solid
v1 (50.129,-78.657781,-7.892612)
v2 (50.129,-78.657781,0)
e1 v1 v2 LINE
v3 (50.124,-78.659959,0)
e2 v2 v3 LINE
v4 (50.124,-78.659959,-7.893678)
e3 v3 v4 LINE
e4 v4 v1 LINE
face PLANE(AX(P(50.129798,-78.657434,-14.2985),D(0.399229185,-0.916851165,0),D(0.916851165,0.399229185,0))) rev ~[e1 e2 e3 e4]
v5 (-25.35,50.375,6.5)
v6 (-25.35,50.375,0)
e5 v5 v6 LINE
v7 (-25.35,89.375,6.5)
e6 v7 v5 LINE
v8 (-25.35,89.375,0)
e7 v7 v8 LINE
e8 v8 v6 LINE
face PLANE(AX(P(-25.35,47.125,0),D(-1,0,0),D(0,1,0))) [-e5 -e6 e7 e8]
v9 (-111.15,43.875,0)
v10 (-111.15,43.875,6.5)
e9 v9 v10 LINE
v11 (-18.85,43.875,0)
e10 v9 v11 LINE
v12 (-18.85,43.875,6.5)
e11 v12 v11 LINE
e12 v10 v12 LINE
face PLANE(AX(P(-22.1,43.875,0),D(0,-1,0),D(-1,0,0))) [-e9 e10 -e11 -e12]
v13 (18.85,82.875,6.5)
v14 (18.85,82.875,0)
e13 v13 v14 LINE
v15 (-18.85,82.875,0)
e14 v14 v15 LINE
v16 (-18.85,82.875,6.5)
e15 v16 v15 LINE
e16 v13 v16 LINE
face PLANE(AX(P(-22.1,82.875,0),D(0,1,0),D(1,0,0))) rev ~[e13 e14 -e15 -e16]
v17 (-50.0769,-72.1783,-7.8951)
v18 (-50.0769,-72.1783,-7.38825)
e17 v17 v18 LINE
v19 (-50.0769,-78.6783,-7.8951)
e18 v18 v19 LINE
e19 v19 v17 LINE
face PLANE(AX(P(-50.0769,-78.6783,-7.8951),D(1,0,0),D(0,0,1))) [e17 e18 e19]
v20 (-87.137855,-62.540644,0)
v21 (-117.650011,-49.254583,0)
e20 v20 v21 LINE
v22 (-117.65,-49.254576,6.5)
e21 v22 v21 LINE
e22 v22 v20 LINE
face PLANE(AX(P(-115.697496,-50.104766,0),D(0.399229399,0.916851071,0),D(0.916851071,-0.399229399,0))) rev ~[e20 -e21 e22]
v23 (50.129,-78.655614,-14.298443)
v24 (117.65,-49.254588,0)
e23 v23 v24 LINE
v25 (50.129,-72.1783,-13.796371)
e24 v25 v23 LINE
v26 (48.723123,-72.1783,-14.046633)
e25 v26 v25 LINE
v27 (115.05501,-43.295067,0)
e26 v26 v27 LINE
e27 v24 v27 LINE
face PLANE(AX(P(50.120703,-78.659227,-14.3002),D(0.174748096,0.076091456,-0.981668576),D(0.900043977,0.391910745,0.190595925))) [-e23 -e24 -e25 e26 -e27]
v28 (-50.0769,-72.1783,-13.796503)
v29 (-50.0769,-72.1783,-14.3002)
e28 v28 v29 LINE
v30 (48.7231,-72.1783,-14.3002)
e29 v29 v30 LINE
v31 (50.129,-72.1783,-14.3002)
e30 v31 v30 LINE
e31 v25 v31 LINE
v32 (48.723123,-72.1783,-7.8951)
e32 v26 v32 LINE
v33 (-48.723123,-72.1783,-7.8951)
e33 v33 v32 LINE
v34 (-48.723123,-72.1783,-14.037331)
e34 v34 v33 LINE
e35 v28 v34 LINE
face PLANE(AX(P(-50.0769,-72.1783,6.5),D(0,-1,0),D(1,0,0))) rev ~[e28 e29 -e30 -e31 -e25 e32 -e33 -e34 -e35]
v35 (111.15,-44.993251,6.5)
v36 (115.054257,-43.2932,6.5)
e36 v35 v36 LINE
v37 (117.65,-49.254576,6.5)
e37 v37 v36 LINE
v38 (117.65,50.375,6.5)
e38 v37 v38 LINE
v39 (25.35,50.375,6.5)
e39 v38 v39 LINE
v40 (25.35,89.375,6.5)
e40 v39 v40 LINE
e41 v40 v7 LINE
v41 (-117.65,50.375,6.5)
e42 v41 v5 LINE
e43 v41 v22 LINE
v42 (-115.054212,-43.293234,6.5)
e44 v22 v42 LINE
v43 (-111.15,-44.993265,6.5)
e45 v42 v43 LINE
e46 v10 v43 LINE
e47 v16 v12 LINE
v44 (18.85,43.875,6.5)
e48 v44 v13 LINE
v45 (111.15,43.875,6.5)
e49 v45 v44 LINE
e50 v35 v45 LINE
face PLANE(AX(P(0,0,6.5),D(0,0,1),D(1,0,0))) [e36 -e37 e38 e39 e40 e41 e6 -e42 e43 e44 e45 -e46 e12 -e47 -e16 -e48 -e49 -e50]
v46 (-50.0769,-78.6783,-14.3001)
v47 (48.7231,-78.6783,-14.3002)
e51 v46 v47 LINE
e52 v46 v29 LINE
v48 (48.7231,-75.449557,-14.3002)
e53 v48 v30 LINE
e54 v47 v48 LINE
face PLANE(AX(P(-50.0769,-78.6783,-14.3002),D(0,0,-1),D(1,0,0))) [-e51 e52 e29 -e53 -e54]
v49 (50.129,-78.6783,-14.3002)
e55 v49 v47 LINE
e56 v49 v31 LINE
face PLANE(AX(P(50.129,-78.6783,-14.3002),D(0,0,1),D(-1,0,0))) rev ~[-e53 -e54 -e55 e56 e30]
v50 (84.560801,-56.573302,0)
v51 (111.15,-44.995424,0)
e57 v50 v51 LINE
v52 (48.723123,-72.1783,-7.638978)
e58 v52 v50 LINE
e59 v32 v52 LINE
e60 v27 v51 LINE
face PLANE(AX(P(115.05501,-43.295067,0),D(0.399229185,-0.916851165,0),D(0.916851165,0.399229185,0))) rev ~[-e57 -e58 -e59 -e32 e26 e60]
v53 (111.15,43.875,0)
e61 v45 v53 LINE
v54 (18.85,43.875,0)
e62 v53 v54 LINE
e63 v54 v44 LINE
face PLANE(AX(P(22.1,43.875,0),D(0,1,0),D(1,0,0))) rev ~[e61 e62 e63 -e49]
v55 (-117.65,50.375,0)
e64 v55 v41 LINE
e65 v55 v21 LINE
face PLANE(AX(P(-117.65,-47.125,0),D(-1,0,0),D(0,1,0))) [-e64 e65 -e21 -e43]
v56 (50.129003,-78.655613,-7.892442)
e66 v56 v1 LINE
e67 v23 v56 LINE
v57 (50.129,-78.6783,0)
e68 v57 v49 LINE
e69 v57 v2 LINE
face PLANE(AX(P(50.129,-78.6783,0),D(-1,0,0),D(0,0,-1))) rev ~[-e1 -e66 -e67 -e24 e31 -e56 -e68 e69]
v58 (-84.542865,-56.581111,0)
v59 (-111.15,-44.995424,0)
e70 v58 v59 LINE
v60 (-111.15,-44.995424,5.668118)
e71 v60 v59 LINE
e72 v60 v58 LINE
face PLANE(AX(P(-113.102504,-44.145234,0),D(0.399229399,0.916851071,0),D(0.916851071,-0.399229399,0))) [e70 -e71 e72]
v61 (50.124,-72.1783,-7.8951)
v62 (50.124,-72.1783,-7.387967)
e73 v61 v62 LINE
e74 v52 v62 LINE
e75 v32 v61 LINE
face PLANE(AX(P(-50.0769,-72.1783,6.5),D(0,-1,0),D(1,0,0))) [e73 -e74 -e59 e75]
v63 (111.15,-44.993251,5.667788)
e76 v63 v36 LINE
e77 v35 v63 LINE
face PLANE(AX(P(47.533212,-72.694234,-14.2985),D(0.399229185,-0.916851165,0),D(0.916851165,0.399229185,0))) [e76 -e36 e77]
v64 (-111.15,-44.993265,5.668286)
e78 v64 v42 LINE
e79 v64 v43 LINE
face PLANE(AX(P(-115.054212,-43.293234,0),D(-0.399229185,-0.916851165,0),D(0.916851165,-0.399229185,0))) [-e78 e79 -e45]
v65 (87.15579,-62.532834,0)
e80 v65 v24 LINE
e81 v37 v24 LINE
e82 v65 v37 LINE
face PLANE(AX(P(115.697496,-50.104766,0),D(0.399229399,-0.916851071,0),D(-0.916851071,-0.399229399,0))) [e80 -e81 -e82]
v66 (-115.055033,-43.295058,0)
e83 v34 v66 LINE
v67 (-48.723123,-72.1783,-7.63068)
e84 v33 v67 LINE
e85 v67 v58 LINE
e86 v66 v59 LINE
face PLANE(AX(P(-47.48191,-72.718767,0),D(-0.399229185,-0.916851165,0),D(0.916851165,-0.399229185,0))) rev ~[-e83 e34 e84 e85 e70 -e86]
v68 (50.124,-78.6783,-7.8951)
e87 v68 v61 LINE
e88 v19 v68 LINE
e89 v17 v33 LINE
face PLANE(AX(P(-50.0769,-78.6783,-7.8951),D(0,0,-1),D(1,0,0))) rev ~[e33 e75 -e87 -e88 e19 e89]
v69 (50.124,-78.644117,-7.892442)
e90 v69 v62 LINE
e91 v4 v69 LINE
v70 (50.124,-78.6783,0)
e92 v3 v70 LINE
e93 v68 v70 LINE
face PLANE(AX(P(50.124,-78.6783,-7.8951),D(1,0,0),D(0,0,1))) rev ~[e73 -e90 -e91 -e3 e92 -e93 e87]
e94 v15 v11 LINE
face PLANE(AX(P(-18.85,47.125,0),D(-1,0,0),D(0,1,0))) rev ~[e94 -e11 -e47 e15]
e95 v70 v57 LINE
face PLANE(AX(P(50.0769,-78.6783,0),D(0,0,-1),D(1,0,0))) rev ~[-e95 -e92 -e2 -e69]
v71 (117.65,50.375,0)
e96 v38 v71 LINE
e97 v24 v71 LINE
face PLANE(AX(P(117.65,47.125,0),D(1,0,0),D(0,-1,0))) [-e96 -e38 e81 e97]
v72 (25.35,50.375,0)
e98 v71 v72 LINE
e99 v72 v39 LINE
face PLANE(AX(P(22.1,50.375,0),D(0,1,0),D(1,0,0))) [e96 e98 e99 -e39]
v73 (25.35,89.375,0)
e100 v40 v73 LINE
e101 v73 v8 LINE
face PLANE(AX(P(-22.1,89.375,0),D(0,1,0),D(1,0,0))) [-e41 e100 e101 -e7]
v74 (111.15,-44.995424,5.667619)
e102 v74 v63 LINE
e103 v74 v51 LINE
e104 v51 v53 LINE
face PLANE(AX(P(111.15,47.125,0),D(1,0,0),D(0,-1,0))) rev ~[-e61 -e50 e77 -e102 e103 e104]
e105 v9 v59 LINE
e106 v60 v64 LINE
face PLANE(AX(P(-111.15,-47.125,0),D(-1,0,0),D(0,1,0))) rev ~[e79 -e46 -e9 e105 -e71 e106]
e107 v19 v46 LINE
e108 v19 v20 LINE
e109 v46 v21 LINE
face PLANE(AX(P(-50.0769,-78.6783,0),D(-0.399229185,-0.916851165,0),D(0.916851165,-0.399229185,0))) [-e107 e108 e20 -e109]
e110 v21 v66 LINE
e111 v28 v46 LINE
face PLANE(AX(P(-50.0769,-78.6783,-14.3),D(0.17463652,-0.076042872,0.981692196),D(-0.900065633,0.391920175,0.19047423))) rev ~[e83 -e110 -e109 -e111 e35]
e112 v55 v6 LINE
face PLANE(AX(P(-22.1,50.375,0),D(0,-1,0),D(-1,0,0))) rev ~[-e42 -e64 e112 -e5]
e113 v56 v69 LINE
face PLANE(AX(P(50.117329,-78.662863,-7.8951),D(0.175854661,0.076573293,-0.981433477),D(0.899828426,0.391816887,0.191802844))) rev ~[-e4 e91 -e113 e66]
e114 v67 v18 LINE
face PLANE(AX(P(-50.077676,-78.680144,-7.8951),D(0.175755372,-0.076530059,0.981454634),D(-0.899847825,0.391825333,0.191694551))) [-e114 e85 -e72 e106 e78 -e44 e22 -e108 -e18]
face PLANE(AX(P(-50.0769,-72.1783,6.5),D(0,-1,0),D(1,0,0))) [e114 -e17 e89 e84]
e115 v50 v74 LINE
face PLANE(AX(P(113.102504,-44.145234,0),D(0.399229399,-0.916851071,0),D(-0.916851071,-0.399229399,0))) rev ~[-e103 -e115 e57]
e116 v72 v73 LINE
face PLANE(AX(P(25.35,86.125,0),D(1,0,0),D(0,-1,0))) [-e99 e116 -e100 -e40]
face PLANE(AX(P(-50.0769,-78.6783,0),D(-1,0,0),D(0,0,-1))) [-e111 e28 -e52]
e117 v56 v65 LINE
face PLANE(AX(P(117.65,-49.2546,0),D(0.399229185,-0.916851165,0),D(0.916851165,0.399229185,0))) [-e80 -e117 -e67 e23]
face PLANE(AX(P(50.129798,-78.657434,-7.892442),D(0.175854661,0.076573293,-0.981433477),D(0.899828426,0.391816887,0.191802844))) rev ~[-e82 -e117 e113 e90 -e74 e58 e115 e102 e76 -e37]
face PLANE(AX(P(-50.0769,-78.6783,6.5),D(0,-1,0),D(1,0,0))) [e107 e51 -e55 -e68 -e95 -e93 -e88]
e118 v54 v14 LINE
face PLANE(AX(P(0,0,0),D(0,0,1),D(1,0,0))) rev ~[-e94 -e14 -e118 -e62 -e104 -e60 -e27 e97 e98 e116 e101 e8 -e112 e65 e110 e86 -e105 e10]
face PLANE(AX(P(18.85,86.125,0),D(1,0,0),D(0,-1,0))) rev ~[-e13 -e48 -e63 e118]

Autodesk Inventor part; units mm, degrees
ref_plane "YZ Plane" through (0, 0, 0) normal (1, 0, 0) x (0, 1, 0)
ref_plane "XZ Plane" through (0, 0, 0) normal (0, 1, 0) x (-1, 0, 0)
ref_plane "XY Plane" through (0, 0, 0) normal (0, 0, 1) x (1, 0, 0)
sketch "Sketch1" plane through (0, 0, 0) normal (0, 0, 1) x (1, 0, 0)
  line L0 (-107.9, 41.925) -> (107.9, -41.925) construction
  line L1 (107.9, 41.925) -> (-107.9, -41.925) construction
  line L2 (-114.4, -47.125) -> (-114.4, 47.125)
  line L3 (114.4, 47.125) -> (114.4, -47.125)
  line L4 (114.4, -47.125) -> (-114.4, 47.125) construction
  line L5 (-114.4, -47.125) -> (114.4, 47.125) construction
  line L6 (-22.1, 47.125) -> (-22.1, 86.125)
  line L7 (-22.1, 86.125) -> (22.1, 86.125)
  line L8 (22.1, 86.125) -> (22.1, 47.125)
  line L9 (22.1, 47.125) -> (114.4, 47.125)
  line L10 (-22.1, 47.125) -> (-114.4, 47.125)
  line L11 (114.4, -47.125) -> (49.4, -75.4283)
  line L12 (-114.4, -47.125) -> (-49.4, -75.4283)
  line L13 (49.4, -75.4283) -> (-49.4, -75.4283)
  point P0 (0, 0)
  point P1 (0, 0)
  point P2 (0, 80.925)
  point P3 (0, 0)
  point P4 (0, 86.125)
  point P5 (0, 0)
  dimension "Comp" = 215.8
  dimension "Lar" = 83.85
  dimension "d10" = 215.8
  dimension "LarMaior" = 94.25
  dimension "CompMaior" = 228.8
  dimension "d20" = 39
  dimension "d21" = 44.2
  dimension "d25" = 65
  dimension "d27" = 65
  dimension "d28" = 98.8
extrude "Extrusion1" add sketch "Sketch1" along normal blind 6.5
shell "Shell1" thickness 6.5 both sides yes removed faces 2 at (-7.3667, -34.5772, 6.5) at (-7.3667, -34.5772, 0)
sketch "Sketch2" plane through (-50.0769, -78.6783, 0) normal (-0.3992292, -0.9168512, 0) x (0.9168512, -0.3992292, 0)
  line L0 (0, 0) -> (0, -14.3)
  line L1 (-113.4763, 0) -> (-73.7013, 0) projected
  line L2 (0, -14.3) -> (-73.7013, 0)
  line L3 (-73.7013, 0) -> (0, 0)
  point P0 (14.5024, 0)
  dimension "d32" = 14.3
extrude "Extrusion2" add sketch "Sketch2" against normal blind 6.5
sketch "Sketch3" plane through (-50.0769, -78.6783, 6.5) normal (0, -1, 0) x (1, 0, 0)
  line L0 (0, -20.8002) -> (98.8, -20.8002)
  line L1 (100.2059, -6.5) -> (100.2059, -20.8002)
  line L2 (100.2059, -20.8002) -> (98.8, -20.8002)
  line L3 (0, -6.5) -> (0, 0) projected
  line L4 (0, -6.5) -> (0, -20.8002)
  line L5 (0, -6.5) -> (100.1538, -6.5) projected
  line L6 (0, -6.5) -> (100.2059, -6.5)
  line L7 (0, 0) -> (100.1538, 0) projected
  point P0 (50.0769, -6.5)
  dimension "d35" = 98.8
extrude "Extrusion3" add sketch "Sketch3" against normal blind 6.5
sketch "Sketch4" plane through (117.65, -49.2546, 0) normal (0.3992292, -0.9168512, 0) x (0.9168512, 0.3992292, 0)
  line L0 (-165.5274, -14.3002) -> (-73.6535, -14.3002) projected
  line L1 (0, 0) -> (0, 6.5) projected
  line L2 (-73.6535, -14.3002) -> (0, 0)
  line L3 (0, 0) -> (-73.6535, 0)
  line L4 (-73.6535, 0) -> (-73.6535, -14.3002)
  point P0 (-88.2037, 0)
extrude "Extrusion4" add sketch "Sketch4" against normal blind 6.5
sketch "Sketch5" plane through (-50.0769, -78.6783, 6.5) normal (0, -1, 0) x (1, 0, 0)
  line L0 (0, -20.8) -> (0, 0) projected
  line L1 (100.2009, 0) -> (0, 0)
  line L2 (0, 0) -> (0, -14.3951)
  line L3 (0, -14.3951) -> (100.2009, -14.3951)
  line L4 (100.2009, -14.3951) -> (100.2009, 0)
  point P0 (50.0769, -6.5)
extrude "Extrusion5" cut sketch "Sketch5" against normal blind 6.5
sketch "Sketch6" plane through (-117.65, -49.2546, 0) normal (-0.3992292, -0.9168512, 0) x (0.9168512, -0.3992292, 0)
  line L0 (73.7013, -14.3) -> (73.7013, -7.8951) projected
  line L1 (0, 0) -> (0, 6.5) projected
  line L2 (73.7013, -7.8951) -> (0, 6.5)
  line L3 (0, 6.5) -> (73.7013, 6.5)
  line L4 (73.7013, 6.5) -> (73.7013, -7.8951)
  point P0 (88.2037, 0)
extrude "Extrusion6" cut sketch "Sketch6" against normal blind 6.5
sketch "Sketch8" plane through (50.129, -78.6556, -14.2985) normal (0.3992292, -0.9168512, 0) x (0.9168512, 0.3992292, 0)
  line L0 (-0.0136, 6.4034) -> (-91.8829, 6.4034) projected
  line L1 (-0.0054, 20.7985) -> (73.6445, 20.7985) projected
  line L2 (-0.0136, 6.4034) -> (73.6445, 20.7985)
  line L3 (73.6445, 20.7985) -> (-0.0136, 20.7985)
  line L4 (69.3853, 20.7985) -> (1.2969, 20.7985) projected
  line L5 (-0.0136, 20.7985) -> (-0.0136, 6.4034)
  line L6 (0, 0) -> (0, 14.2985) projected
  point P0 (-14.5592, 14.2985)
extrude "Extrusion7" cut sketch "Sketch8" against normal blind 6.5
properties part number "Buste2-2"
